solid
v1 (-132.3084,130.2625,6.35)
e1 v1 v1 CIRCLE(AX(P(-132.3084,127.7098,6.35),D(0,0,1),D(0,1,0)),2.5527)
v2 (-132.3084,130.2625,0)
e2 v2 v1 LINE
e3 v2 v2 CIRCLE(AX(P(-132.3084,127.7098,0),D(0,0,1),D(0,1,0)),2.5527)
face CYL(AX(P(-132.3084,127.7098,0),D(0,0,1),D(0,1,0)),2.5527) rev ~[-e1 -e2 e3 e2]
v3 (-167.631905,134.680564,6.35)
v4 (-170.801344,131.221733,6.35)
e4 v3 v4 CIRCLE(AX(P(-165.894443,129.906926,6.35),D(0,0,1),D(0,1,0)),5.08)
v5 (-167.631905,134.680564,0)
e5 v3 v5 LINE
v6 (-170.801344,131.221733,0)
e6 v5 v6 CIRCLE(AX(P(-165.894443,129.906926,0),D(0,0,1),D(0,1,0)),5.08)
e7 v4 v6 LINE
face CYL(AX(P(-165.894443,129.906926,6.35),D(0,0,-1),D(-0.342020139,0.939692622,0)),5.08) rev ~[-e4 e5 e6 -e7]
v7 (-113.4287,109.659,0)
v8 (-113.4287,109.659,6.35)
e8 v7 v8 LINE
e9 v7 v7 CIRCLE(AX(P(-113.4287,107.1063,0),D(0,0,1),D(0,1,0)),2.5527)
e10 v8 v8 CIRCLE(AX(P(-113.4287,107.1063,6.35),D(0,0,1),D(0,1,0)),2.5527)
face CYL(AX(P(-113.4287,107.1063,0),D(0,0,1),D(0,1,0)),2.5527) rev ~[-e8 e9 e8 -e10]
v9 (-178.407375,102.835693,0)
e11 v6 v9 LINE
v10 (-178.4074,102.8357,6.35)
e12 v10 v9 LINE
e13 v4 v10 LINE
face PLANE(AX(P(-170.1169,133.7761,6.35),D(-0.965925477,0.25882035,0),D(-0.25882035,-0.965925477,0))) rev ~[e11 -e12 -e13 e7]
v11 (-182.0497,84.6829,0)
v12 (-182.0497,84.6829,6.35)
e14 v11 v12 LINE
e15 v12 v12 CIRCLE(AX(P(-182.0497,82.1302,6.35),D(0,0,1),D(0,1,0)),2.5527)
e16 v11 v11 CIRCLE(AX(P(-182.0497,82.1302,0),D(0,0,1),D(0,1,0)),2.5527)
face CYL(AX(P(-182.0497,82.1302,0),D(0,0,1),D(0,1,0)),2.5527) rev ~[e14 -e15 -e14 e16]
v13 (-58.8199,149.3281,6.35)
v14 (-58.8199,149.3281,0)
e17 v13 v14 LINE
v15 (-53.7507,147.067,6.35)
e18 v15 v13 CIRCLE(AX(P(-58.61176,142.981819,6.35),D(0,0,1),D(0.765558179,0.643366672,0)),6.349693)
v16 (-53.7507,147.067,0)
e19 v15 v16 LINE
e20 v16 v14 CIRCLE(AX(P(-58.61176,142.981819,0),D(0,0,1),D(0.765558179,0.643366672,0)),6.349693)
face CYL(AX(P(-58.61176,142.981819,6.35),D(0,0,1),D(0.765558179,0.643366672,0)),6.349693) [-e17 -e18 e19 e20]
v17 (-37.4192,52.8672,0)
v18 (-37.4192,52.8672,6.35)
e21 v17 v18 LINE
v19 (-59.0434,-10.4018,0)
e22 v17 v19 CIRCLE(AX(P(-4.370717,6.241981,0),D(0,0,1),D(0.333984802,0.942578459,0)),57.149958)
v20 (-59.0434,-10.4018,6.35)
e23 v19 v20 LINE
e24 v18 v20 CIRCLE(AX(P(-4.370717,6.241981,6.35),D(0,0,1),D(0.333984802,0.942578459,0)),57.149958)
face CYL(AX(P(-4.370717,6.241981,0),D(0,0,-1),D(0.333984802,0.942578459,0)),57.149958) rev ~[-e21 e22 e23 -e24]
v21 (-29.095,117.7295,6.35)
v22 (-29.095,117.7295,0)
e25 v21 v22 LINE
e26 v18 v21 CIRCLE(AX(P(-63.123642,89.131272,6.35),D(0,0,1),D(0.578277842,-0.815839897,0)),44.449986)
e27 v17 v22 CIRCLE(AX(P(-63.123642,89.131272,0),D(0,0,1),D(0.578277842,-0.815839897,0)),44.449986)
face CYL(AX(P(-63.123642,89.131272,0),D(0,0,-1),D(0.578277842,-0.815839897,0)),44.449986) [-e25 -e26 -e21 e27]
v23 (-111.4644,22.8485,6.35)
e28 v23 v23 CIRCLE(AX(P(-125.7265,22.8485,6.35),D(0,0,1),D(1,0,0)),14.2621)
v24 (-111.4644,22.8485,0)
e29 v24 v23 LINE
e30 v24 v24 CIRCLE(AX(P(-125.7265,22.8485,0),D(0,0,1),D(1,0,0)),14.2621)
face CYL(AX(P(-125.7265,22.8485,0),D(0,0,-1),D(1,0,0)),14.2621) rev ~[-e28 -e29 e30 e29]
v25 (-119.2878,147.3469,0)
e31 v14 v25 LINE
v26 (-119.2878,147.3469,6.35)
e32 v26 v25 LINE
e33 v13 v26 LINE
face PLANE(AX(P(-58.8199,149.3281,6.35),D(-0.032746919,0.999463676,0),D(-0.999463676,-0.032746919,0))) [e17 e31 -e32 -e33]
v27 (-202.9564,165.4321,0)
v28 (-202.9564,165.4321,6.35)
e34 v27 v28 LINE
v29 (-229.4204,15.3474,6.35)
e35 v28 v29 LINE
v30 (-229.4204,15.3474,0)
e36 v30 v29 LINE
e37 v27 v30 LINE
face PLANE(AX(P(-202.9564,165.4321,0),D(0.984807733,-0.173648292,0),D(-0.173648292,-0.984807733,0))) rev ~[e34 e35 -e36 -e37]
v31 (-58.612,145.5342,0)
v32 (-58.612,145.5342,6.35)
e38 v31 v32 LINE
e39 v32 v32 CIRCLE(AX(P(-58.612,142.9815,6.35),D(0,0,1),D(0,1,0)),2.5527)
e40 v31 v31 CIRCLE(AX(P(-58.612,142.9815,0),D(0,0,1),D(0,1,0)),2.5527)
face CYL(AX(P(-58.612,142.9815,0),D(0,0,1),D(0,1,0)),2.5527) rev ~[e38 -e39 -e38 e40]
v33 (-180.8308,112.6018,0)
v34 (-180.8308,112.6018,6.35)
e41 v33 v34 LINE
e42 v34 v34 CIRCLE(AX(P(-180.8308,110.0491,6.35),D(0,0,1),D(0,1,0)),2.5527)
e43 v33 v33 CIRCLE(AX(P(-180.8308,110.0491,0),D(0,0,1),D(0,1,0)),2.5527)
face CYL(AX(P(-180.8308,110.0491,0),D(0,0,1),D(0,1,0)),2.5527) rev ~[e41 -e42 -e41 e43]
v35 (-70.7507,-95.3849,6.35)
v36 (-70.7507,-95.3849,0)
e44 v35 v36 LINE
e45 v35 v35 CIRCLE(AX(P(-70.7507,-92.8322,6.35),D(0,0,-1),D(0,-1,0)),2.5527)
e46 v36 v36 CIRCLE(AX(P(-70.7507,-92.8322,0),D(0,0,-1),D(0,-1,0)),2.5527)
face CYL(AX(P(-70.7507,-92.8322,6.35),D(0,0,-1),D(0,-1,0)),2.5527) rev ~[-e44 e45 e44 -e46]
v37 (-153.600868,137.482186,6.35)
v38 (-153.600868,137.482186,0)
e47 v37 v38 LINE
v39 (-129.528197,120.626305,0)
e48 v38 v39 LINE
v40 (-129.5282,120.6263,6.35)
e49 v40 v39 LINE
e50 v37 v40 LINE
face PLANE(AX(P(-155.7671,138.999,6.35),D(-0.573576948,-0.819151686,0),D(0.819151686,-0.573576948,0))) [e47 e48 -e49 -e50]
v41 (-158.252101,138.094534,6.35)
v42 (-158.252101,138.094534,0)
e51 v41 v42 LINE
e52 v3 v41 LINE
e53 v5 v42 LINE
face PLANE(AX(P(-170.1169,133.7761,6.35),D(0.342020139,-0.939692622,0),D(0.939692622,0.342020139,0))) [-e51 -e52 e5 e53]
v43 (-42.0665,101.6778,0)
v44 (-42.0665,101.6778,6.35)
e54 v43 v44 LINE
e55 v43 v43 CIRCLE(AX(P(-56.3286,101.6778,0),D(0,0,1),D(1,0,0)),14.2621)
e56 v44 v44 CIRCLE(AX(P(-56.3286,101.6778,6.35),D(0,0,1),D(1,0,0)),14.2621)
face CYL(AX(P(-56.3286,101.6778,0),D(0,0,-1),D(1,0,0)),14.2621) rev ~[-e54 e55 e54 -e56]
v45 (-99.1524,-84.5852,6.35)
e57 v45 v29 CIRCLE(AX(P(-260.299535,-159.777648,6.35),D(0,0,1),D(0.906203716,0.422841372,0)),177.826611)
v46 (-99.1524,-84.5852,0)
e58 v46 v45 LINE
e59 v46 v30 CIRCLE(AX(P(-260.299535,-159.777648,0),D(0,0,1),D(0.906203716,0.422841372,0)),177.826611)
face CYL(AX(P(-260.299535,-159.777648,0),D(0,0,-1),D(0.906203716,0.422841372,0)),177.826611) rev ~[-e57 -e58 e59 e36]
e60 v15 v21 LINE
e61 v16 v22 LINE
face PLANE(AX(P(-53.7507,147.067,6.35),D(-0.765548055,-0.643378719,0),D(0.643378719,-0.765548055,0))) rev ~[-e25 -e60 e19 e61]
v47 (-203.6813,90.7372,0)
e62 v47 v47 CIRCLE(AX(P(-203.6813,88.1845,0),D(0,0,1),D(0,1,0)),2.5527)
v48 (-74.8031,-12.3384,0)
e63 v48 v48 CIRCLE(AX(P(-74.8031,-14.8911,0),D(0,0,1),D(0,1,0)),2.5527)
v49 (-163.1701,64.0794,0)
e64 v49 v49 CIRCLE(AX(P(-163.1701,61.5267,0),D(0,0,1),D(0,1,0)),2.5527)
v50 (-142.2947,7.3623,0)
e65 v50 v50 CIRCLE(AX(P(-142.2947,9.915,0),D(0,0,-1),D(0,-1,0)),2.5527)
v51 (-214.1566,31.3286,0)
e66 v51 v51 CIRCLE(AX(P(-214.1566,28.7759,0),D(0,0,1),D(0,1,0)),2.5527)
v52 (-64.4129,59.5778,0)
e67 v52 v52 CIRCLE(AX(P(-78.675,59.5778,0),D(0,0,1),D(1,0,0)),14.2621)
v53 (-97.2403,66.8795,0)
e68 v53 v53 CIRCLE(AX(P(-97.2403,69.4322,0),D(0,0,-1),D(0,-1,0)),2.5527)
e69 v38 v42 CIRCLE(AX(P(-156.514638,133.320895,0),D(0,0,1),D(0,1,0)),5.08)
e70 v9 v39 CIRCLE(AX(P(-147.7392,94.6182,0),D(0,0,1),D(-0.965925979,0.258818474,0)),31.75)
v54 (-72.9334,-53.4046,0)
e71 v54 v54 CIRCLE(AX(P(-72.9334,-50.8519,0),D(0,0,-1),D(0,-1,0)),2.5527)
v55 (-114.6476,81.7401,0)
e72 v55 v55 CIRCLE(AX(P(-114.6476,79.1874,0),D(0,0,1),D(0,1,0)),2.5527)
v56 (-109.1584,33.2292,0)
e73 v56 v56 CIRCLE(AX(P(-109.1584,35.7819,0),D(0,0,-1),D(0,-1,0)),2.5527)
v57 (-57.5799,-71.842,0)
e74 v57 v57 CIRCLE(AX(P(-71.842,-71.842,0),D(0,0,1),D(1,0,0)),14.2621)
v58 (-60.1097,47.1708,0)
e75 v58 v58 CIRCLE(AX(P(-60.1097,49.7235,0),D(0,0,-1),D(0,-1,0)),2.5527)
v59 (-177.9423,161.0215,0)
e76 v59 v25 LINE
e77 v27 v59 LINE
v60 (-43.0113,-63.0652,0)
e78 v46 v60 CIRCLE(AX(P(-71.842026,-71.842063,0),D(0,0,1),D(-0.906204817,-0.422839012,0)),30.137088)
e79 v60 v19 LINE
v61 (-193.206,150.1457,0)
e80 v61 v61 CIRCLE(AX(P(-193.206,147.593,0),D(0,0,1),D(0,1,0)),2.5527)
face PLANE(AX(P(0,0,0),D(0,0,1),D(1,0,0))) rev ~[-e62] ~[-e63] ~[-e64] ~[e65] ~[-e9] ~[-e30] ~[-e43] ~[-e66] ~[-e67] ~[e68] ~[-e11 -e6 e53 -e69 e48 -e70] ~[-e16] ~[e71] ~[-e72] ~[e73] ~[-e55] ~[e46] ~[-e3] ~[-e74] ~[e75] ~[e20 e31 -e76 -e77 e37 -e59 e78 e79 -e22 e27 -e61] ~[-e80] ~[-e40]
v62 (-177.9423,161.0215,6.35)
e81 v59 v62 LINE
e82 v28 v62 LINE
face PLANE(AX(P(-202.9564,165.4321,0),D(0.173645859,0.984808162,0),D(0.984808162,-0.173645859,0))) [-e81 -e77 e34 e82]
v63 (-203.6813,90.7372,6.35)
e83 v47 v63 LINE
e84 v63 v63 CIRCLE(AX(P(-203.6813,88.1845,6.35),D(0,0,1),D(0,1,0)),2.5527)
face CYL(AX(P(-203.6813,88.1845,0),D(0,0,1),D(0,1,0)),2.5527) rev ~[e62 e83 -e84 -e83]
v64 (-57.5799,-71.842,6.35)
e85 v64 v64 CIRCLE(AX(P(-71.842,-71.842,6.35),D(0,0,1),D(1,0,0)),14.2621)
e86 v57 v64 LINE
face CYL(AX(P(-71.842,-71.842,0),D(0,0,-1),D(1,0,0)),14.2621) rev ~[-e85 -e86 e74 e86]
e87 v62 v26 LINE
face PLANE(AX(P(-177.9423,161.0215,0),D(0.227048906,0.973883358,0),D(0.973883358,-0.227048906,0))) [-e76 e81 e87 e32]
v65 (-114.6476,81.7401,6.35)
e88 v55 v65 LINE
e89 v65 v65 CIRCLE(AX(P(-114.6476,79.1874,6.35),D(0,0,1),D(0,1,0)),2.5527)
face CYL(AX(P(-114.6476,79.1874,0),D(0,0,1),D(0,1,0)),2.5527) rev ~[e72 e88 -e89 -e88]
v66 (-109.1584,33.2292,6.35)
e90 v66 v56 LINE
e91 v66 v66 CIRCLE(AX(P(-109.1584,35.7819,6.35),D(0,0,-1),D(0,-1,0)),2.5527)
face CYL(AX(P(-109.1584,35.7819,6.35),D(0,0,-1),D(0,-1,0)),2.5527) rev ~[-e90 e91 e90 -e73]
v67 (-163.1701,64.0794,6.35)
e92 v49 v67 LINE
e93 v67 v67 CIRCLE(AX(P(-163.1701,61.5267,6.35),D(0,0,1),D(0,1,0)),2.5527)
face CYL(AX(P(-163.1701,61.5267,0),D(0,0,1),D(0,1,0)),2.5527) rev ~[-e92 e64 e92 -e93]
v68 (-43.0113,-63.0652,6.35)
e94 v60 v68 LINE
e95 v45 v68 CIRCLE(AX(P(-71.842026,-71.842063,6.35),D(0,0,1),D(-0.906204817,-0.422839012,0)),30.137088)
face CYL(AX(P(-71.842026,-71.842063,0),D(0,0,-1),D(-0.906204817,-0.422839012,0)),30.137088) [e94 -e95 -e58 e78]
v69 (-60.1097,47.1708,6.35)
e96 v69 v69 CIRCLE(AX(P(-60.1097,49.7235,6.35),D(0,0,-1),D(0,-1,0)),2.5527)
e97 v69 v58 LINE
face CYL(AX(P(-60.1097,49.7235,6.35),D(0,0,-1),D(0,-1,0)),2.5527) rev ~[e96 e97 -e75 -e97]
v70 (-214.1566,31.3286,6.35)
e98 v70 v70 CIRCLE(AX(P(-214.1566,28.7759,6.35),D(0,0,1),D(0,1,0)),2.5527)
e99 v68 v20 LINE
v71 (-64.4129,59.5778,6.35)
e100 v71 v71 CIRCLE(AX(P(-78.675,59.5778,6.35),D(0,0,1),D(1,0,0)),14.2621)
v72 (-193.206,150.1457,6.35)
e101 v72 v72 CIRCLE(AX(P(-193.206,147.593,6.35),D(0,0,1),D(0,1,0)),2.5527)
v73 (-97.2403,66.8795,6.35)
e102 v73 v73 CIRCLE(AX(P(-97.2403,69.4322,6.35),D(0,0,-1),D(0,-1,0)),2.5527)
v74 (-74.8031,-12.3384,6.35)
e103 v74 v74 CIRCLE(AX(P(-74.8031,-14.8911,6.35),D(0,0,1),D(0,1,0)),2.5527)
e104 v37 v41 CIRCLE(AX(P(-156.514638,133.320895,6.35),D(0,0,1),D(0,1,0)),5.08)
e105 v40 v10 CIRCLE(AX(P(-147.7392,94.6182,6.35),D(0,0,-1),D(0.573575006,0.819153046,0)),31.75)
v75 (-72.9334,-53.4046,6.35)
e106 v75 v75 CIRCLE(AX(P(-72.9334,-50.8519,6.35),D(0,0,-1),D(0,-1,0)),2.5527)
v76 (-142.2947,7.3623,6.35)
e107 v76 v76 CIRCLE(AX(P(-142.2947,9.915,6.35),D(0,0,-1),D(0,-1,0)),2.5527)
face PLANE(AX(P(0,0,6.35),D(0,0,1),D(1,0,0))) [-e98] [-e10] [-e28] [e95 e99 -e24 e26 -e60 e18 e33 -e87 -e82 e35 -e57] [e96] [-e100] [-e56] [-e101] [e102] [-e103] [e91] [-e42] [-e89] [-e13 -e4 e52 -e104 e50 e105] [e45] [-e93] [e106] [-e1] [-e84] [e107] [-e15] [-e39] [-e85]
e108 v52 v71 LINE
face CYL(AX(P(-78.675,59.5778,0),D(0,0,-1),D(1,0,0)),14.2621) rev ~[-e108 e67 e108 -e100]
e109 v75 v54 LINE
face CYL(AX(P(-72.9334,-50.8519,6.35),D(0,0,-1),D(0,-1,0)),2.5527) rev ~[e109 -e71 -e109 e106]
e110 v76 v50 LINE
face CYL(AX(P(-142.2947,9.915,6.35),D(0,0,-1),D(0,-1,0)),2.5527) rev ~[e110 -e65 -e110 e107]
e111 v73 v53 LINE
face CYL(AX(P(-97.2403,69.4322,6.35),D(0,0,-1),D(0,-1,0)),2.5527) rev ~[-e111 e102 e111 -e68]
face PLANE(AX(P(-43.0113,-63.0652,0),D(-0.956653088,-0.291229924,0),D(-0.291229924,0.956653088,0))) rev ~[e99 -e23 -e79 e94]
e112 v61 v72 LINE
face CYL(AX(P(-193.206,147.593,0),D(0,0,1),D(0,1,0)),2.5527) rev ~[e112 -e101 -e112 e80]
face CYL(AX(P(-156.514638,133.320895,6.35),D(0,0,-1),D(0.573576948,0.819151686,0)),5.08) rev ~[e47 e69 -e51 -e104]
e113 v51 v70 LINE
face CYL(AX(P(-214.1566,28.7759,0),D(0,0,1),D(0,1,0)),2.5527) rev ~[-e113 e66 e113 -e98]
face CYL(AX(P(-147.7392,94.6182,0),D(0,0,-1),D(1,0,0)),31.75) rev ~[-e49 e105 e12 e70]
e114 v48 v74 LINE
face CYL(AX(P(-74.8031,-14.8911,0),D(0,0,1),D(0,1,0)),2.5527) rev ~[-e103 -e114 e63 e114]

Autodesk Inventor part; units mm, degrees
ref_plane "YZ Plane" through (0, 0, 0) normal (1, 0, 0) x (0, 1, 0)
ref_plane "XZ Plane" through (0, 0, 0) normal (0, 1, 0) x (-1, 0, 0)
ref_plane "XY Plane" through (0, 0, 0) normal (0, 0, 1) x (1, 0, 0)
sketch "Sketch1" plane through (0, 0, 0) normal (0, 0, 1) x (1, 0, 0)
  circle A0 centre (71.842, 71.842) radius 50.8 construction
  circle A1 centre (-71.842, -71.842) radius 50.8 construction
  circle A2 centre (0, 0) radius 50.8 construction
  line L0 (-35.921, -35.921) -> (35.921, 35.921) construction
  line L1 (71.842, 71.842) -> (-71.842, -71.842) construction
  line L2 (-4.3707, 6.2419) -> (-4.3707, 50.6116) construction
  line L3 (-226.8798, -122.642) -> (638.5123, -122.642) construction
  circle A3 centre (147.8406, -65.492) radius 57.15 construction
  circle A4 centre (71.842, 71.842) radius 14.2621
  circle A5 centre (-71.842, -71.842) radius 14.2621
  circle A6 centre (-4.3707, 6.2419) radius 57.15 construction
  circle A7 centre (-71.842, -71.842) radius 30.1371 construction
  circle A8 centre (71.842, 71.842) radius 30.1371 construction
  circle A9 centre (-56.3286, 101.6778) radius 14.2621
  line L4 (-56.3286, 101.6778) -> (71.842, 71.842) construction
  circle A10 centre (71.842, 71.842) radius 14.3256 construction
  circle A11 centre (-71.842, -71.842) radius 14.3256 construction
  circle A12 centre (-78.675, 59.5778) radius 14.2621
  line L5 (-71.842, -71.842) -> (-78.675, 59.5778) construction
  circle A13 centre (-78.675, 59.5778) radius 23.8316 construction
  circle A14 centre (-56.3286, 101.6778) radius 23.8316 construction
  line L6 (14.7165, 60.1103) -> (61.7767, 43.4355)
  line L7 (-43.0113, -63.0652) -> (-59.0434, -10.4018)
  arc A15 (14.7165, 60.1103) -> (-59.0434, -10.4018) centre (-4.3707, 6.2419) ccw
  line L8 (-202.9564, 165.4321) -> (-177.9423, 161.0215)
  line L9 (-177.9423, 161.0215) -> (-204.4062, 10.9368) construction
  line L10 (-204.4062, 10.9368) -> (-229.4204, 15.3474) construction
  line L11 (-229.4204, 15.3474) -> (-202.9564, 165.4321) construction
  line L12 (-248.4004, -92.2937) -> (35.0702, -142.2772) construction
  line L13 (-201.8537, 171.6857) -> (161.0026, 107.7043) construction
  line L14 (-201.8537, 171.6857) -> (-248.4004, -92.2937) construction
  circle A16 centre (-147.7392, 94.6182) radius 31.75
  line L15 (-77.4376, 35.7784) -> (-74.4797, -21.1106) construction
  circle A17 centre (13.0879, 85.5189) radius 9.525 construction
  line L16 (-190.4493, 163.2268) -> (-216.9133, 13.1421) construction
  line L17 (-193.206, 147.593) -> (-214.1566, 28.7759) construction
  circle A18 centre (-147.7392, 94.6182) radius 17.4625 construction
  circle A19 centre (-147.7392, 94.6182) radius 9.525
  circle A20 centre (-56.3286, 101.6778) radius 30.1816 construction
  line L18 (-202.9564, 165.4321) -> (-229.4204, 15.3474)
  arc A21 (61.7767, 43.4355) -> (78.6846, 101.1921) centre (71.842, 71.842) ccw
  arc A22 (-99.1524, -84.5852) -> (-43.0113, -63.0652) centre (-71.842, -71.842) ccw
  line L19 (-147.7392, 94.6182) -> (-131.3298, 100.5908) construction
  line L20 (-113.4287, 107.1063) -> (-182.0497, 82.1302) construction
  circle A23 centre (-182.0497, 82.1302) radius 4.7625 construction
  line L21 (0, 0) -> (-4.3707, 6.2419) construction
  circle A24 centre (71.842, 71.842) radius 28.6512 construction
  line L22 (62.334, 44.8145) -> (-61.0615, 88.2239) construction
  line L23 (75.2477, 100.2901) -> (-54.6333, 115.8388) construction
  line L24 (-177.9423, 161.0215) -> (78.6846, 101.1921)
  line L25 (-147.7392, 94.6182) -> (-125.7265, 22.8485) construction
  circle A25 centre (-125.7265, 22.8485) radius 31.75 construction
  circle A26 centre (-125.7265, 22.8485) radius 14.2621
  line L26 (-78.675, 59.5778) -> (-125.7265, 22.8485) construction
  circle A27 centre (-147.7392, 94.6182) radius 25.4 construction
  arc A28 (-99.1524, -84.5852) -> (-229.4204, 15.3474) centre (-260.2996, -159.7777) ccw
  circle A29 centre (-147.7392, 94.6182) radius 36.5125 construction
  line L27 (-180.8308, 110.0491) -> (-147.7392, 94.6182) construction
  arc A30 (-37.4192, 52.8672) -> (-41.9551, 128.217) centre (-63.1237, 89.1313) ccw
  arc A31 (-41.9551, 128.217) -> (-49.4759, 131.0711) centre (-56.3286, 101.6778) ccw
  point P0 (-75.9587, 7.3339)
  point P1 (-203.6813, 88.1845)
  point P2 (-203.6813, 88.1845)
  point P3 (-144.7069, 111.8154)
  point P4 (-161.1163, 105.8429)
  point P5 (-164.1486, 88.6457)
  point P6 (-150.7715, 77.421)
  point P7 (-134.3622, 83.3936)
  point P8 (-123.871, 103.3056)
  point P9 (-143.3285, 119.6324)
  point P10 (-167.1967, 110.945)
  point P11 (-171.6074, 85.9309)
  point P12 (-152.1499, 69.6041)
  point P13 (-128.2817, 78.2914)
  point P14 (-160.2272, 128.9288)
  point P15 (-182.0497, 82.1302)
  point P16 (-135.2512, 60.3077)
  point P17 (-132.3084, 127.7098)
  point P18 (-163.1701, 61.5267)
  point P19 (-114.6476, 79.1874)
  point P20 (-74.8031, -14.8911)
  dimension "d7" = 101.6
  dimension "d18" = 47.6631
  dimension "d34" = 34.925
  dimension "d65" = 50.8
  dimension "d3" = 45
  dimension "d4" = 0
  dimension "d8" = 101.6
  dimension "d9" = 28.5242
  dimension "d10" = 101.6
  dimension "d11" = 114.3
  dimension "d12" = 114.3
  dimension "d13" = 15.875
  dimension "d14" = 15.875
  dimension "d15" = 131.5974
  dimension "d16" = 28.6512
  dimension "d17" = 131.5974
  dimension "d19" = 47.6631
  dimension "d22" = 25.4
  dimension "d23" = 152.4
  dimension "d26" = 268.0517
  dimension "d27" = 63.5
  dimension "d30" = 203.2
  dimension "d31" = 10
  dimension "d32" = 19.05
  dimension "d33" = 120.65
  dimension "d35" = 19.05
  dimension "d36" = 6.35
  dimension "d40" = 360
  dimension "d44" = 9.525
  dimension "d55" = 80
  dimension "d56" = 7.62
  dimension "d57" = 6.35
  dimension "d58" = 57.3024
  dimension "d59" = 63.5
  dimension "d60" = 75.0697
  dimension "d61" = 59.69
  dimension "d62" = 55
  dimension "d68" = 360
  dimension "d70" = 41.275
  dimension "d71" = 60
  dimension "d88" = 360
  dimension "d93" = 360
  dimension "d95" = 45
  dimension "d102" = 44.45
  dimension "d116" = 22.225
extrude "Extrusion1" add sketch "Sketch1" along normal blind 6.35 contours A15 L7 A22 A28 L18 L8 L24 A31 A30
hole "Hole1" at (13.0879, 85.5189, 0) at (-193.206, 147.593, 0) at (-203.6813, 88.1845, 0) at (-214.1566, 28.7759, 0) at (-131.3298, 100.5908, 0) at (-144.7069, 111.8154, 0) at (-161.1163, 105.8429, 0) at (-164.1486, 88.6457, 0) at (-150.7715, 77.421, 0) at (-134.3622, 83.3936, 0) at (-152.1499, 69.6041, 0) at (-171.6074, 85.9309, 0) at (-167.1967, 110.945, 0) at (-143.3285, 119.6324, 0) at (-123.871, 103.3056, 0) at (-128.2817, 78.2914, 0) at (-132.3084, 127.7098, 0) at (-180.8308, 110.0491, 0) at (-163.1701, 61.5267, 0) at (-114.6476, 79.1874, 0) at (-182.0497, 82.1302, 0) at (-113.4287, 107.1063, 0) at (-74.8031, -14.8911, 0) direction (0, 0, 1) diameter 5.1054 end through all clearance for "Flat Head Machine Screw (82)" size "#10" standard "Ansi Unified Screw Threads"
sketch "Sketch2" plane through (0, 0, 6.35) normal (0, 0, 1) x (1, 0, 0)
  circle A0 centre (-214.1566, 28.7759) radius 2.5527 construction
  circle A1 centre (-193.206, 147.593) radius 2.5527 construction
  circle A2 centre (-203.6813, 88.1845) radius 2.5527 construction
  line L0 (-43.0113, -63.0652) -> (-59.0434, -10.4018) construction
  arc A3 (-37.4192, 52.8672) -> (-59.0434, -10.4018) centre (-4.3707, 6.2419) ccw construction
  line L1 (-49.4759, 131.0711) -> (-177.9423, 161.0215) construction
  line L2 (-177.9423, 161.0215) -> (-202.9564, 165.4321) construction
  line L3 (-202.9564, 165.4321) -> (-229.4204, 15.3474) construction
  arc A4 (-99.1524, -84.5852) -> (-229.4204, 15.3474) centre (-260.2996, -159.7777) ccw construction
  arc A5 (-99.1524, -84.5852) -> (-43.0113, -63.0652) centre (-71.842, -71.842) ccw construction
  circle A6 centre (-78.675, 59.5778) radius 14.2621 construction
  circle A7 centre (-125.7265, 22.8485) radius 14.2621 construction
  circle A8 centre (-56.3286, 101.6778) radius 14.2621 construction
  circle A9 centre (-71.842, -71.842) radius 14.2621 construction
  line L4 (-72.9334, -50.8519) -> (-70.7507, -92.8322) construction
  line L5 (-142.2947, 9.915) -> (-109.1584, 35.7819) construction
  line L6 (-97.2403, 69.4322) -> (-60.1097, 49.7235) construction
  line L7 (-74.8938, 111.5322) -> (-37.7633, 91.8235) construction
  line L8 (41.3438, 49.8338) -> (78.4744, 30.1251) construction
  circle A10 centre (-78.675, 59.5778) radius 14.2621 construction
  line L9 (-56.3286, 101.6778) -> (-78.675, 59.5778) construction
  line L10 (-56.3286, 101.6778) -> (59.9091, 39.9795) construction
  line L11 (-78.675, 59.5778) -> (-125.7265, 22.8485) construction
  line L12 (-78.675, 59.5778) -> (-71.842, -71.842) construction
  arc A11 (-37.4192, 52.8672) -> (-41.9551, 128.217) centre (-63.1237, 89.1313) ccw projected
  arc A12 (-41.9551, 128.217) -> (-49.4759, 131.0711) centre (-56.3286, 101.6778) ccw projected
  point P0 (0, 0)
  dimension "d72" = 42.037
hole "Hole2" at (-72.9334, -50.8519, 6.35) at (-109.1584, 35.7819, 6.35) at (-70.7507, -92.8322, 6.35) at (-142.2947, 9.915, 6.35) at (-60.1097, 49.7235, 6.35) at (-97.2403, 69.4322, 6.35) at (78.4744, 30.1251, 6.35) at (41.3438, 49.8338, 6.35) direction (0, 0, -1) diameter 5.1054 end through all clearance for "Flat Head Machine Screw (82)" size "#10" standard "Ansi Unified Screw Threads"
sketch "Sketch4" plane through (0, 0, 6.35) normal (0, 0, 1) x (1, 0, 0)
  circle A0 centre (-60.1097, 49.7235) radius 2.5527 construction
  circle A1 centre (-70.7507, -92.8322) radius 2.5527 construction
  circle A2 centre (-72.9334, -50.8519) radius 2.5527 construction
  circle A3 centre (-109.1584, 35.7819) radius 2.5527 construction
  circle A4 centre (-142.2947, 9.915) radius 2.5527 construction
  circle A5 centre (-97.2403, 69.4322) radius 2.5527 construction
  circle A6 centre (-182.0497, 82.1302) radius 2.5527 construction
  circle A7 centre (-163.1701, 61.5267) radius 2.5527 construction
  circle A8 centre (-132.3084, 127.7098) radius 2.5527 construction
  circle A9 centre (-214.1566, 28.7759) radius 2.5527 construction
  circle A10 centre (-193.206, 147.593) radius 2.5527 construction
  circle A11 centre (-203.6813, 88.1845) radius 2.5527 construction
  circle A12 centre (-180.8308, 110.0491) radius 2.5527 construction
  circle A13 centre (-114.6476, 79.1874) radius 2.5527 construction
  circle A14 centre (-113.4287, 107.1063) radius 2.5527 construction
  line L0 (-43.0113, -63.0652) -> (-59.0434, -10.4018) construction
  arc A15 (-37.4192, 52.8672) -> (-59.0434, -10.4018) centre (-4.3707, 6.2419) ccw construction
  line L1 (-49.4759, 131.0711) -> (-177.9423, 161.0215) construction
  line L2 (-177.9423, 161.0215) -> (-202.9564, 165.4321) construction
  line L3 (-202.9564, 165.4321) -> (-229.4204, 15.3474) construction
  arc A16 (-99.1524, -84.5852) -> (-229.4204, 15.3474) centre (-260.2996, -159.7777) ccw construction
  arc A17 (-99.1524, -84.5852) -> (-43.0113, -63.0652) centre (-71.842, -71.842) ccw construction
  circle A18 centre (-78.675, 59.5778) radius 14.2621 construction
  circle A19 centre (-125.7265, 22.8485) radius 14.2621 construction
  circle A20 centre (-147.7392, 94.6182) radius 31.75 construction
  circle A21 centre (-56.3286, 101.6778) radius 14.2621 construction
  circle A22 centre (-71.842, -71.842) radius 14.2621 construction
  circle A23 centre (-182.0497, 82.1302) radius 2.5527 construction
  circle A24 centre (-113.4287, 107.1063) radius 2.5527 construction
  line L4 (-182.0497, 82.1302) -> (-113.4287, 107.1063) construction
  line L5 (-170.1169, 133.7761) -> (-155.7671, 138.999)
  line L6 (-155.7671, 138.999) -> (-129.5282, 120.6263)
  circle A25 centre (-147.7392, 94.6182) radius 31.75 construction
  line L7 (-170.1169, 133.7761) -> (-178.4074, 102.8357)
  arc A26 (-129.5282, 120.6263) -> (-178.4074, 102.8357) centre (-147.7392, 94.6182) ccw
  arc A27 (-37.4192, 52.8672) -> (-41.9551, 128.217) centre (-63.1237, 89.1313) ccw projected
  arc A28 (-41.9551, 128.217) -> (-49.4759, 131.0711) centre (-56.3286, 101.6778) ccw projected
  point P0 (0, 0)
  dimension "d96" = 44.45
  dimension "d98" = 125
extrude "Extrusion3" cut sketch "Sketch4" against normal through all
fillet "Fillet2" radius 5.08 2 edges at (-155.7671, 138.999, 3.175) (-170.1169, 133.7761, 3.175)
sketch "Sketch5" plane through (0, 0, 6.35) normal (0, 0, 1) x (1, 0, 0)
  line L0 (-202.9564, 165.4321) -> (-229.4204, 15.3474) construction
  line L1 (-49.4759, 131.0711) -> (-177.9423, 161.0215) projected
  arc A0 (-53.7507, 147.067) -> (-58.8199, 149.3281) centre (-58.612, 142.9815) ccw
  arc A1 (-41.9551, 128.217) -> (-49.4759, 131.0711) centre (-56.3286, 101.6778) ccw projected
  line L2 (-58.8199, 149.3281) -> (-119.2878, 147.3469)
  arc A2 (-37.4192, 52.8672) -> (-41.9551, 128.217) centre (-63.1237, 89.1313) ccw projected
  line L3 (-153.6009, 137.4822) -> (-129.5282, 120.6263) construction
  arc A3 (-178.4074, 102.8357) -> (-129.5282, 120.6263) centre (-147.7392, 94.6182) ccw construction
  line L4 (-178.4074, 102.8357) -> (-170.8013, 131.2218) construction
  arc A4 (-167.6319, 134.6806) -> (-170.8013, 131.2218) centre (-165.8944, 129.907) ccw construction
  line L5 (-167.6319, 134.6806) -> (-158.2521, 138.0946) construction
  arc A5 (-153.6009, 137.4822) -> (-158.2521, 138.0946) centre (-156.5146, 133.3209) ccw construction
  circle A6 centre (-60.1097, 49.7235) radius 2.5527 construction
  circle A7 centre (-70.7507, -92.8322) radius 2.5527 construction
  circle A8 centre (-72.9334, -50.8519) radius 2.5527 construction
  circle A9 centre (-109.1584, 35.7819) radius 2.5527 construction
  circle A10 centre (-142.2947, 9.915) radius 2.5527 construction
  circle A11 centre (-97.2403, 69.4322) radius 2.5527 construction
  circle A12 centre (-182.0497, 82.1302) radius 2.5527 construction
  circle A13 centre (-163.1701, 61.5267) radius 2.5527 construction
  circle A14 centre (-132.3084, 127.7098) radius 2.5527 construction
  circle A15 centre (-214.1566, 28.7759) radius 2.5527 construction
  circle A16 centre (-193.206, 147.593) radius 2.5527 construction
  circle A17 centre (-203.6813, 88.1845) radius 2.5527 construction
  circle A18 centre (-180.8308, 110.0491) radius 2.5527 construction
  circle A19 centre (-114.6476, 79.1874) radius 2.5527 construction
  circle A20 centre (-113.4287, 107.1063) radius 2.5527 construction
  arc A21 (-37.4192, 52.8672) -> (-59.0434, -10.4018) centre (-4.3707, 6.2419) ccw construction
  arc A22 (-37.4192, 52.8672) -> (-41.9551, 128.217) centre (-63.1237, 89.1313) ccw construction
  arc A23 (-41.9551, 128.217) -> (-49.4759, 131.0711) centre (-56.3286, 101.6778) ccw construction
  line L6 (-49.4759, 131.0711) -> (-177.9423, 161.0215) construction
  line L7 (-177.9423, 161.0215) -> (-202.9564, 165.4321) construction
  line L8 (-202.9564, 165.4321) -> (-229.4204, 15.3474) construction
  arc A24 (-99.1524, -84.5852) -> (-229.4204, 15.3474) centre (-260.2996, -159.7777) ccw construction
  arc A25 (-99.1524, -84.5852) -> (-43.0113, -63.0652) centre (-71.842, -71.842) ccw construction
  line L9 (-43.0113, -63.0652) -> (-59.0434, -10.4018) construction
  circle A26 centre (-78.675, 59.5778) radius 14.2621 construction
  circle A27 centre (-125.7265, 22.8485) radius 14.2621 construction
  circle A28 centre (-56.3286, 101.6778) radius 14.2621 construction
  circle A29 centre (-71.842, -71.842) radius 14.2621 construction
  line L10 (-53.7507, 147.067) -> (-29.095, 117.7295)
  point P0 (0, 0)
  point P1 (-32.6563, 120.4007)
  dimension "d103" = 146.05
  dimension "d104" = 9.525
  dimension "d105" = 12.7
  dimension "d106" = 15
extrude "Extrusion4" add sketch "Sketch5" against normal up to surface (6.35 mm away)
sketch "Sketch6" plane through (0, 0, 0) normal (0, 0, -1) x (-1, 0, 0)
  arc A0 (58.8199, 149.3281) -> (53.7507, 147.067) centre (58.612, 142.9815) ccw construction
  point P0 (0, 0)
  point P1 (55.4708, 136.8514)
hole "Hole3" at (-58.612, 142.9815, 0) direction (0, 0, 1) diameter 5.1054 end through all clearance for "Flat Head Machine Screw (82)" size "#10" standard "Ansi Unified Screw Threads"
properties part number "GP10-003" material "Polycarbonate, Smoke"
